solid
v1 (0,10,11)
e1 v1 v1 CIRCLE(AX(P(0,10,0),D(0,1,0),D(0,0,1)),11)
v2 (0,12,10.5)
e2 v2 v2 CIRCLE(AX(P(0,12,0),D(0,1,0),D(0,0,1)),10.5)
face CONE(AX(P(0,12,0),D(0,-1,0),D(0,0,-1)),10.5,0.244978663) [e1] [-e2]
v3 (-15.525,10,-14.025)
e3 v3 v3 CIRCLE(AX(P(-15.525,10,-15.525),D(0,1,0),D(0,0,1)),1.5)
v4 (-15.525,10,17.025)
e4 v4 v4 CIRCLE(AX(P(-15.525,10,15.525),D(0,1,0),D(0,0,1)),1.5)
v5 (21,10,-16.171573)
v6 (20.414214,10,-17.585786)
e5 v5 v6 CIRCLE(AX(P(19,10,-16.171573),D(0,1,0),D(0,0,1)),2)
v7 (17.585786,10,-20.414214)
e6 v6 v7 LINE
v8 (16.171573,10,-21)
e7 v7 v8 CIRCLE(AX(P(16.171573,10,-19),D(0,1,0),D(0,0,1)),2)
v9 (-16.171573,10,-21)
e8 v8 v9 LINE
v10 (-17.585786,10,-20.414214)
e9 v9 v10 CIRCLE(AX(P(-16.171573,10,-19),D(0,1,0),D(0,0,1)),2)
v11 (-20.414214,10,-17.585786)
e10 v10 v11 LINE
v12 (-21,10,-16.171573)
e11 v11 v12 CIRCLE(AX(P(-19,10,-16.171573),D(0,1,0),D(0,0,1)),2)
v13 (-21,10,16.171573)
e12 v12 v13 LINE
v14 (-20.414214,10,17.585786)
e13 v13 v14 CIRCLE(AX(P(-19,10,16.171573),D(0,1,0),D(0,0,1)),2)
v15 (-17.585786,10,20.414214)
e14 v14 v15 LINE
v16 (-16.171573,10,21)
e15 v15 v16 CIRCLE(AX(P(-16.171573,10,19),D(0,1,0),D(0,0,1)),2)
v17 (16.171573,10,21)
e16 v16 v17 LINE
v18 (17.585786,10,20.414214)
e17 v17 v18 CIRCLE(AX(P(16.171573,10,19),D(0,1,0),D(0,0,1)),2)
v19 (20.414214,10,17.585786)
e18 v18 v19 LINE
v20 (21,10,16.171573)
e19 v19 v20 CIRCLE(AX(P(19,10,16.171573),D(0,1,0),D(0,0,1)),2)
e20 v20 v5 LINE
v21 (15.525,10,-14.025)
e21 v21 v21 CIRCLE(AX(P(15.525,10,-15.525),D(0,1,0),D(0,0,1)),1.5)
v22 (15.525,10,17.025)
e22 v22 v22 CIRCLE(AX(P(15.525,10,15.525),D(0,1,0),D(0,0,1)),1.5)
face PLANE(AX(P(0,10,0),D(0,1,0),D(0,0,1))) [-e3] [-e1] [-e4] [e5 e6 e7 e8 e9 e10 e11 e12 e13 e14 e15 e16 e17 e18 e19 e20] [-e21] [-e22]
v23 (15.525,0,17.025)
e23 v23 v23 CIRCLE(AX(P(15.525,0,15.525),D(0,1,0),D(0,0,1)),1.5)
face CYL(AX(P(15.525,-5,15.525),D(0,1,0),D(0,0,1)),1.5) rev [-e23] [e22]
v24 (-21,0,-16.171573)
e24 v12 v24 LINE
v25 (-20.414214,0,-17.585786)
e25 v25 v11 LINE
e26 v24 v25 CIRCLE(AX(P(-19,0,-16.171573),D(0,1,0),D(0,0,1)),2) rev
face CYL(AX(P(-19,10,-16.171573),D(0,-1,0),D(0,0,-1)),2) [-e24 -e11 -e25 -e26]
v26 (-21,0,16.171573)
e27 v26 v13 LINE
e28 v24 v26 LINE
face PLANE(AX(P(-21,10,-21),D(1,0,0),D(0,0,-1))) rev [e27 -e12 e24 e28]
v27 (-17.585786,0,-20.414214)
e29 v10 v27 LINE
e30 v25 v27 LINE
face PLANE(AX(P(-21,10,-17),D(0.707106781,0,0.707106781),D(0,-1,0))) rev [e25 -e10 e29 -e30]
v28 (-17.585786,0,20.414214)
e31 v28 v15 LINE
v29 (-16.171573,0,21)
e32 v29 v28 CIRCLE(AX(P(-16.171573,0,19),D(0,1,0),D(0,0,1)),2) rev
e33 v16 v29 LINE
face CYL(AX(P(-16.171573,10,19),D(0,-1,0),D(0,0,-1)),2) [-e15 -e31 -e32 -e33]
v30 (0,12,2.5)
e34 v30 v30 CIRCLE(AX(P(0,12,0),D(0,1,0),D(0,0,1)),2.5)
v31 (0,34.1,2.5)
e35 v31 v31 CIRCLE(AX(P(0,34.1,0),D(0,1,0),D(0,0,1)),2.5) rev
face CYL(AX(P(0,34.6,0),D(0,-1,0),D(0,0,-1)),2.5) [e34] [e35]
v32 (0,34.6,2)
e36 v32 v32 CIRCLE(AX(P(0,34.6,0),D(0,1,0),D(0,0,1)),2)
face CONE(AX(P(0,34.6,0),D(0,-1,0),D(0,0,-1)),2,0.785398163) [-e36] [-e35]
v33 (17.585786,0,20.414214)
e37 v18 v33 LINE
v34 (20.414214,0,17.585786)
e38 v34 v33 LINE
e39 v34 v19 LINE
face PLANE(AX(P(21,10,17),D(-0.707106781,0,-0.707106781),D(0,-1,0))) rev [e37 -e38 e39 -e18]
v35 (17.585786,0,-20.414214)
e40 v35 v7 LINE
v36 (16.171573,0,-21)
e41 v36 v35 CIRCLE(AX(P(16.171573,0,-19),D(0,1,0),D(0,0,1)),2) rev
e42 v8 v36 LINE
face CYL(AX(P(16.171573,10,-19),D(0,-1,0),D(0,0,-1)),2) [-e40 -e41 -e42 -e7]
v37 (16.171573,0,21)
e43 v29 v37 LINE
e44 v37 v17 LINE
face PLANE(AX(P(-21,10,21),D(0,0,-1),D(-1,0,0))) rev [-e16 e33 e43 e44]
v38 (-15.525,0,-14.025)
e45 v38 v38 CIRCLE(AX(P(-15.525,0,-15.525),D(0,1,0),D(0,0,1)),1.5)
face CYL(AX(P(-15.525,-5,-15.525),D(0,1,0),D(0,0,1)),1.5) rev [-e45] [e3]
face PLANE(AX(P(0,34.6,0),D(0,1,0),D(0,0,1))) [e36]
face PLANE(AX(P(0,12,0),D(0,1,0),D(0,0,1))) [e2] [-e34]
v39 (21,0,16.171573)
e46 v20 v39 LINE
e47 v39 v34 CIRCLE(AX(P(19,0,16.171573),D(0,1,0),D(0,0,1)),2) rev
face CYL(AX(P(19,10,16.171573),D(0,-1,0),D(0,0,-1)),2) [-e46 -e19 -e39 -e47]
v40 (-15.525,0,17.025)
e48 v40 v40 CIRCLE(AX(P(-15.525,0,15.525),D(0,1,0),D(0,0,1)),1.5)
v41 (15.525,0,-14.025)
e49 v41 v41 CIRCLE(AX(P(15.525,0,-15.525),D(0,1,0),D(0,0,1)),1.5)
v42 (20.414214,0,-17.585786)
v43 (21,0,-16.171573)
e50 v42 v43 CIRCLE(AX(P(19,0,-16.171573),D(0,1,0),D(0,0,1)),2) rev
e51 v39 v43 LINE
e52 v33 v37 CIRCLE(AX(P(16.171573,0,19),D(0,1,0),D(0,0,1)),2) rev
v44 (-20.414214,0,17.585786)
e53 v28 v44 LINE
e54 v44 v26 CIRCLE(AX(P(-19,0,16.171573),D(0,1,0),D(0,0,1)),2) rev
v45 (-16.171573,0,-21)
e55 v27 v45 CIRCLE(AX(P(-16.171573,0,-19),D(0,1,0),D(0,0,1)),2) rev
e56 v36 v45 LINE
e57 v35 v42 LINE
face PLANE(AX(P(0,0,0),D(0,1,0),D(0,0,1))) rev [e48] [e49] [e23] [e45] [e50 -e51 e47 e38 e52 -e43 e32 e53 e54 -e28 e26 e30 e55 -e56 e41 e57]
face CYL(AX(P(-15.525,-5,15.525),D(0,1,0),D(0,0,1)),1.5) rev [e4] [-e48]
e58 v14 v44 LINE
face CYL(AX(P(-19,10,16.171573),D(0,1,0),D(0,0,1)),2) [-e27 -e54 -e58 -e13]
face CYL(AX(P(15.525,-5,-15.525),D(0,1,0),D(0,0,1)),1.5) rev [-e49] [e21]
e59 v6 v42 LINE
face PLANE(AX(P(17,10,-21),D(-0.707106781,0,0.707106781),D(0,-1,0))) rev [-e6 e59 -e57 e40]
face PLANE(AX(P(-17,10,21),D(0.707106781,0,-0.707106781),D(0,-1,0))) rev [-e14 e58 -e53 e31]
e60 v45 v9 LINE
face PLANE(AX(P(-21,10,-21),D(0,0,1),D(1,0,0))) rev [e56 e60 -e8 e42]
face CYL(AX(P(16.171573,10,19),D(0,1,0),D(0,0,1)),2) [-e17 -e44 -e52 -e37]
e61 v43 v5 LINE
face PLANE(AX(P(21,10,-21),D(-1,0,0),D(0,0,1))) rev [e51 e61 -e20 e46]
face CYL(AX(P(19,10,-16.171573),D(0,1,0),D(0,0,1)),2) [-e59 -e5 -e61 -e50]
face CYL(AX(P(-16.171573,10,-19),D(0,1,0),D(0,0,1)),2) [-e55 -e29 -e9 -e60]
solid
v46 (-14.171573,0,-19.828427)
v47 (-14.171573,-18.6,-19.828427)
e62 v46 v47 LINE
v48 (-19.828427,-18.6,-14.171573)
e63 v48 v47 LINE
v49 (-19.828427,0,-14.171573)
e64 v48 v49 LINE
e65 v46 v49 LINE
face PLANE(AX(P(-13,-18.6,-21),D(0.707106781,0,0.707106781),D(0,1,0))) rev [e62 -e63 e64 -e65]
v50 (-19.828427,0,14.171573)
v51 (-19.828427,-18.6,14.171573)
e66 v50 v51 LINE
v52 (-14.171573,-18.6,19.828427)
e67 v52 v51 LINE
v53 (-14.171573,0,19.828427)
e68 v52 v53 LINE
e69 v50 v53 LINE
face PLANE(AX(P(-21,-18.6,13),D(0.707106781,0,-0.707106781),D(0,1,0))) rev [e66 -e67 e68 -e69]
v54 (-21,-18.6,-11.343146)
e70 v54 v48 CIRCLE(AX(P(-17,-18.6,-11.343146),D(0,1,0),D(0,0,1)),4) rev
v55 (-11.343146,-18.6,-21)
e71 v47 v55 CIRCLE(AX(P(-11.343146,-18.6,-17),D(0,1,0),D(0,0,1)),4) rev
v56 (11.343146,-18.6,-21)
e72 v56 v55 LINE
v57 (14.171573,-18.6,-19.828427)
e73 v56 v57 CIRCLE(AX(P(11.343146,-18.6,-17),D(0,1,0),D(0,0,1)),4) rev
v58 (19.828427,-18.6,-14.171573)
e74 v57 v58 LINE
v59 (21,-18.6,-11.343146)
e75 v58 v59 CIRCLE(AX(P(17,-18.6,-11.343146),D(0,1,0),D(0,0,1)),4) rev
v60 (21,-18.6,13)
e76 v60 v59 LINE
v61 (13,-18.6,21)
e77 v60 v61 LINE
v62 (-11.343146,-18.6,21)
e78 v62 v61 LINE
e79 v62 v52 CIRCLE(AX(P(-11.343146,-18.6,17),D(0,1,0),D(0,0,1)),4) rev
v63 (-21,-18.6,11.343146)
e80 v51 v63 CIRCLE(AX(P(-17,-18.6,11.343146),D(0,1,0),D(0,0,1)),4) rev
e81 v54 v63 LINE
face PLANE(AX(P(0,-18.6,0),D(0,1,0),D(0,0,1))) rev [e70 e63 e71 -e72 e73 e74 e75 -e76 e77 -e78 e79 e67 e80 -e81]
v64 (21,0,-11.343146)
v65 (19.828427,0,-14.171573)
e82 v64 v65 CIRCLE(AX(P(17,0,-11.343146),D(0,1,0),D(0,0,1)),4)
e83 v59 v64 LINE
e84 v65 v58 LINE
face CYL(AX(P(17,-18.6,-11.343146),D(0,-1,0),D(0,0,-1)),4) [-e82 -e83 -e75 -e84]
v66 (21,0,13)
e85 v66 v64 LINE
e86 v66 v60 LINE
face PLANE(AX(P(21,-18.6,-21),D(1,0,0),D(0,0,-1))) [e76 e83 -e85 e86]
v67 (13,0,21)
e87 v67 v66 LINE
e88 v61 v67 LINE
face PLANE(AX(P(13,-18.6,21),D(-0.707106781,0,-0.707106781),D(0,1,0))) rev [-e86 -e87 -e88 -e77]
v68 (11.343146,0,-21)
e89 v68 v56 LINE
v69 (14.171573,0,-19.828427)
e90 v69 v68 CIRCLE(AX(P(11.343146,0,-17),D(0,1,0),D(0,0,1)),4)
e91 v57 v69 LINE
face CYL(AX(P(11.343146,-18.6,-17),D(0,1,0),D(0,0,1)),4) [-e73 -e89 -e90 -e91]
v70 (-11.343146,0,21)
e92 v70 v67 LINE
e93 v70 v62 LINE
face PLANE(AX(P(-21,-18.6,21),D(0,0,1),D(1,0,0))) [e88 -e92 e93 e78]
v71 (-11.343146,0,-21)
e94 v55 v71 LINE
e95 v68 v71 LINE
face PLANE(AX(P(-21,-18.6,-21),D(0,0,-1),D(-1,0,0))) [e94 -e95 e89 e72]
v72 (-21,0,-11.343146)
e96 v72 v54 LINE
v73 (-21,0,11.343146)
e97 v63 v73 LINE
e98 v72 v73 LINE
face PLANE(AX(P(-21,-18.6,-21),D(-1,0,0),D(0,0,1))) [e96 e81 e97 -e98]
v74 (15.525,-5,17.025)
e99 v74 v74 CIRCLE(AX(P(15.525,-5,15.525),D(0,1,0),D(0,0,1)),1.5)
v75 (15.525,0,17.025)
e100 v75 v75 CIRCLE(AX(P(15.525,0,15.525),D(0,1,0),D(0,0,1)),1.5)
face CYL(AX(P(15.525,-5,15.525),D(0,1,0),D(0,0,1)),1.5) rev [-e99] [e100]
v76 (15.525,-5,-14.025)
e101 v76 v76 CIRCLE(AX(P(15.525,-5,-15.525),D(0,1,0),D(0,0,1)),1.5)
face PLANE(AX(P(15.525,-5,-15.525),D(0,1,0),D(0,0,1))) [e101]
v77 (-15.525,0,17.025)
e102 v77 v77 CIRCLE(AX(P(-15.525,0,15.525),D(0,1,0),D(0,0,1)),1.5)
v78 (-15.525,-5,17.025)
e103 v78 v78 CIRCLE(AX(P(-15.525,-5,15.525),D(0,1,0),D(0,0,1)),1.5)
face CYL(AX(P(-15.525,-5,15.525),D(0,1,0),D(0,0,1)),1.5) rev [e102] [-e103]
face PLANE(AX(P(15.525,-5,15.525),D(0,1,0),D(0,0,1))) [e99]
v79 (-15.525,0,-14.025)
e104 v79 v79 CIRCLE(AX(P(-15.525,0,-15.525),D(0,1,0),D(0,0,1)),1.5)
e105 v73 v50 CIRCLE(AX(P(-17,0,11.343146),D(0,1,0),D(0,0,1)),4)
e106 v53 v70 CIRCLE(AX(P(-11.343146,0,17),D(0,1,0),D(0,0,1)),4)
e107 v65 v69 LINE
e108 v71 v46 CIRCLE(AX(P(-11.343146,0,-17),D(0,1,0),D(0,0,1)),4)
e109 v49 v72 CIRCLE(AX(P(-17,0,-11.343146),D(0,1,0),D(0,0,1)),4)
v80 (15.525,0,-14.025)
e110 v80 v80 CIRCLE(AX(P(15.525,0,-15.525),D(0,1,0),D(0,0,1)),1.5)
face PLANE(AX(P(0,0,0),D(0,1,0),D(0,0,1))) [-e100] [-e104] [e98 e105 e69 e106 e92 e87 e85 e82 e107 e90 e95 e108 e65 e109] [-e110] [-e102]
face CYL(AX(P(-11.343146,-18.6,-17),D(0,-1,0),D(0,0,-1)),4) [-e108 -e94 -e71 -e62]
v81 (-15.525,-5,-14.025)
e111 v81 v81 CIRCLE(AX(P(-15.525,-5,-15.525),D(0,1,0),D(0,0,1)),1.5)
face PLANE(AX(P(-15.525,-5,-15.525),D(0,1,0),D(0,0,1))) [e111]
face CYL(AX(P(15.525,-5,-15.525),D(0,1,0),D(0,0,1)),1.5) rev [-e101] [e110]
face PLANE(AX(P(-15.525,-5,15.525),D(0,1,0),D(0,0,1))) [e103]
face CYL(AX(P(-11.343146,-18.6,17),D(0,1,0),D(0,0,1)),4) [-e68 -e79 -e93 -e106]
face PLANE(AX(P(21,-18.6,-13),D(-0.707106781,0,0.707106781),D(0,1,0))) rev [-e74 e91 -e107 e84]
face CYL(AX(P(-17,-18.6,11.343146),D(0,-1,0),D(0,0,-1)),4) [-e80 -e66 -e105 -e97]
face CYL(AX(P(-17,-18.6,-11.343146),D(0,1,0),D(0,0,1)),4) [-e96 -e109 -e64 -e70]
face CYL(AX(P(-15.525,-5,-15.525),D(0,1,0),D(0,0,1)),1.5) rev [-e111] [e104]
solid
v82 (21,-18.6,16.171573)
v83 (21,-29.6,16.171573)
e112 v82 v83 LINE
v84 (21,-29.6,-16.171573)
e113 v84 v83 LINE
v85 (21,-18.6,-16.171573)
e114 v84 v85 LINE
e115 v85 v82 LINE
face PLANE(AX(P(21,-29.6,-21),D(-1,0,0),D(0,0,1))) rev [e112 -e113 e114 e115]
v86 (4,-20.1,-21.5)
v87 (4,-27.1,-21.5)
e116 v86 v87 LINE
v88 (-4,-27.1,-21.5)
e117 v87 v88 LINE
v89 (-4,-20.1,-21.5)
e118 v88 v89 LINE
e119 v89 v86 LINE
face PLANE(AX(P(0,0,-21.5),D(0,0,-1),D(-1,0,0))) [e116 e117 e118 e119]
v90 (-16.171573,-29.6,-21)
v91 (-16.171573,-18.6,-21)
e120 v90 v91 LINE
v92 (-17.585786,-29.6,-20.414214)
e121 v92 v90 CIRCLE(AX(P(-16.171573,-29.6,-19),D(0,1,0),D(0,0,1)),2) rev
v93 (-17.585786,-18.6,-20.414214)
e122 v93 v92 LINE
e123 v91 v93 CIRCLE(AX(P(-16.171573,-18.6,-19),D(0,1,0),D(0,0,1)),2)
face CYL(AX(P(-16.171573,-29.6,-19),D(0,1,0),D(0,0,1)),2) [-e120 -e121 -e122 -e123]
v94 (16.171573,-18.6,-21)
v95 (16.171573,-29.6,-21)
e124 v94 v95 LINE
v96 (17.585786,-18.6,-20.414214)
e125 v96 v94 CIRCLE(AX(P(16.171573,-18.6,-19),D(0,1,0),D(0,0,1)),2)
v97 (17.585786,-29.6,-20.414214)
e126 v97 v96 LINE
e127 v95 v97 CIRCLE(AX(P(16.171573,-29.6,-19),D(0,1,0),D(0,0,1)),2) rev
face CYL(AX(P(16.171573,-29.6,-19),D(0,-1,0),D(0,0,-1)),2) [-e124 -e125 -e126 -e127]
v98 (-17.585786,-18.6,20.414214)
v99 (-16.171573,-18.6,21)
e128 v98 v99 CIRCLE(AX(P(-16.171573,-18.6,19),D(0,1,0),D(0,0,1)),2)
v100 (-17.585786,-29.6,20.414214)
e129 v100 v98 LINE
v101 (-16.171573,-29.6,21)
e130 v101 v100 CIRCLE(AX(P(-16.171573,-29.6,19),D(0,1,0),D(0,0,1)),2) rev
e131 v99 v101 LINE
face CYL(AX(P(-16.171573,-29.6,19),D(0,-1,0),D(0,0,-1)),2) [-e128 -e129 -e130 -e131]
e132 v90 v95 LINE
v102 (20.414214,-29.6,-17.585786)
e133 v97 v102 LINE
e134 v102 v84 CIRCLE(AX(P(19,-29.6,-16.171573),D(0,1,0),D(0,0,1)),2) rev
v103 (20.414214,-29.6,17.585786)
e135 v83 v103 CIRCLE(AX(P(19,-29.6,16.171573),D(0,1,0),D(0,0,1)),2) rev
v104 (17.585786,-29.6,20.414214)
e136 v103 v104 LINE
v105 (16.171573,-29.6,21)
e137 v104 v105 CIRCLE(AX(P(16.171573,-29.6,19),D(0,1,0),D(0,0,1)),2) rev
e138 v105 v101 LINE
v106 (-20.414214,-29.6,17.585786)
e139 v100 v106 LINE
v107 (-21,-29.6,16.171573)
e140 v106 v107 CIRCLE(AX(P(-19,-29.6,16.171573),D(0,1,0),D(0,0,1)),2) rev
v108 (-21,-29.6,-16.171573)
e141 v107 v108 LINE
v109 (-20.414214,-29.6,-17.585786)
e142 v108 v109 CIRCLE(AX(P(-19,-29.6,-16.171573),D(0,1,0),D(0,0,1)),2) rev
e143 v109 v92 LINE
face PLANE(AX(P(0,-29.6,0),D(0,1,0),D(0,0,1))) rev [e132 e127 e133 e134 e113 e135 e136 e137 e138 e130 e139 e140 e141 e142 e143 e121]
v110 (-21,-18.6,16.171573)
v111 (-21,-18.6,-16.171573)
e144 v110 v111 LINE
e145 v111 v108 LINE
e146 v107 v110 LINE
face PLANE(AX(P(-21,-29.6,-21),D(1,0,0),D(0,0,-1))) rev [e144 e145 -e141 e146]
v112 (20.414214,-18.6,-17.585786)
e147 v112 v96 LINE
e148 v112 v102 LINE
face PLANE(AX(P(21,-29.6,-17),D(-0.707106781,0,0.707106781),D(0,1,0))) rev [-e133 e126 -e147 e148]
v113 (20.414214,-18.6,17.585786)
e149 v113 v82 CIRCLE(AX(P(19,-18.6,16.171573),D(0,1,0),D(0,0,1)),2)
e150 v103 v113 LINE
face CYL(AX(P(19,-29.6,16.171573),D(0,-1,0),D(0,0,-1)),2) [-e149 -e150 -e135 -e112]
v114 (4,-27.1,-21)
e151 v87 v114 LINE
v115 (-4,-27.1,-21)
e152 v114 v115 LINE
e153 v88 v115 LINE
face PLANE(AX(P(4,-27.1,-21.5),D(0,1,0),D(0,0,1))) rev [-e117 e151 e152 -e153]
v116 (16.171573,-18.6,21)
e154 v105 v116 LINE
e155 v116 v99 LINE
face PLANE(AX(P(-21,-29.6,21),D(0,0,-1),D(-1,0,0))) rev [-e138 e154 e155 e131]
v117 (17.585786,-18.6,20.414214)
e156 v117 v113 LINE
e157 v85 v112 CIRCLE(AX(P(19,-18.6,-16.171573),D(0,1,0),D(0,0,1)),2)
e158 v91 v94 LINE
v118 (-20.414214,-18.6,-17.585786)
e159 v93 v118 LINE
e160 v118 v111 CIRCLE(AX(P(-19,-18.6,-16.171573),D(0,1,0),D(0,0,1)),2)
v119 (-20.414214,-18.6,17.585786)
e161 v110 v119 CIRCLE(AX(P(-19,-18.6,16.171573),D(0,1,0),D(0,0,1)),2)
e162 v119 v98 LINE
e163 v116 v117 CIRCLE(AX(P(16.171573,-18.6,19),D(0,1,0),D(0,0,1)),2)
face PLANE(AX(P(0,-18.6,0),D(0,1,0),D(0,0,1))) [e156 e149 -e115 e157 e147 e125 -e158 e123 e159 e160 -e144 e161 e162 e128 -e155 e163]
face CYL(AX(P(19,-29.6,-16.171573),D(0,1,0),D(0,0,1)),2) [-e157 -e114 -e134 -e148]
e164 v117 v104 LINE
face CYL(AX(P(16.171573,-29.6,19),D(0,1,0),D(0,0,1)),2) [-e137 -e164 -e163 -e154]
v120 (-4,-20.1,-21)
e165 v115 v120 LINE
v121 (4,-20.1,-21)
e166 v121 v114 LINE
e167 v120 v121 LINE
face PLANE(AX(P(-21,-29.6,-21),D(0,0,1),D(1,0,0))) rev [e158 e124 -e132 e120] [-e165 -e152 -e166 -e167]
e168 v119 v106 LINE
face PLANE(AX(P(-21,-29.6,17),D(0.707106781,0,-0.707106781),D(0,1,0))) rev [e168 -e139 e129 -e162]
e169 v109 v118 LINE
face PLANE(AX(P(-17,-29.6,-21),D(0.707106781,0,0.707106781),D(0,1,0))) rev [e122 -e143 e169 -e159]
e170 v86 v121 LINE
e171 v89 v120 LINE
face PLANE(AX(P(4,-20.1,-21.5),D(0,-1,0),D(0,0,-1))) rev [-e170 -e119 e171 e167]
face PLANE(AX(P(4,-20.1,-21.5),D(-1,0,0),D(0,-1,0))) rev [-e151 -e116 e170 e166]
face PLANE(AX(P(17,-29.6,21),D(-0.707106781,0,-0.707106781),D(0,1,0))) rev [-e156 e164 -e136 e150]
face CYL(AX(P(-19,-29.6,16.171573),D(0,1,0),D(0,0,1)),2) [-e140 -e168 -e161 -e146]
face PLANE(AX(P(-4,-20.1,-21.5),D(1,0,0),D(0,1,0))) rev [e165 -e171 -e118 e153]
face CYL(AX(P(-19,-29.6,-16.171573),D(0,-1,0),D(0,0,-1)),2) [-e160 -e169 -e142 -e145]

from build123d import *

# Parameters (mm, degrees)
SKETCH1_W           = 42
SKETCH1_H           = 42
BOSS_EXTRUDE1_DEPTH = 10
SKETCH2_R           = 11
BOSS_EXTRUDE2_DEPTH = 2
SKETCH3_R           = 2.5
BOSS_EXTRUDE3_DEPTH = 22.6
CHAMFER2_SIZE       = 0.5
CHAMFER3_SIZE2      = 2
CHAMFER3_SIZE       = 0.5
SKETCH1_4_W         = 42
SKETCH1_4_H         = 42
BOSS_EXTRUDE6_DEPTH = 18.6
SKETCH6_W           = 42
SKETCH6_H           = 42
BOSS_EXTRUDE7_DEPTH = 11
CHAMFER5_SIZE       = 4
CHAMFER6_SIZE       = 4
FILLET2_R           = 2
FILLET3_R           = 2
SKETCH7_W           = 8
SKETCH7_H           = 7
BOSS_EXTRUDE8_DEPTH = 0.5
CHAMFER7_SIZE       = 8
FILLET4_R           = 4
SKETCH8_R           = 1.5
CUT_EXTRUDE2_DEPTH  = 15


with BuildPart() as part:
    # Sketch1 → Boss-Extrude1 (new body)
    with BuildSketch(Plane(origin=(0, 0, 0), x_dir=(1, 0, 0), z_dir=(0, 1, 0))):
        Rectangle(SKETCH1_W, SKETCH1_H)
    extrude(amount=BOSS_EXTRUDE1_DEPTH)

    # Sketch2 → Boss-Extrude2 (add)
    with BuildSketch(Plane(origin=(0, 10, 0), x_dir=(1, 0, 0), z_dir=(0, 1, 0))):
        with Locations(Location((0, 0, 0), (0, 0, 270))):
            Circle(SKETCH2_R)
    extrude(amount=BOSS_EXTRUDE2_DEPTH)

    # Sketch3 → Boss-Extrude3 (add)
    with BuildSketch(Plane(origin=(0, 12, 0), x_dir=(1, 0, 0), z_dir=(0, 1, 0))):
        with Locations(Location((0, 0, 0), (0, 0, 270))):
            Circle(SKETCH3_R)
    extrude(amount=BOSS_EXTRUDE3_DEPTH)

    # Chamfer2
    chamfer2_edges = [part.edges().sort_by_distance(p)[0] for p in [
        (0, 34.6, -2.5),
    ]]
    chamfer(chamfer2_edges, length=CHAMFER2_SIZE)

    # Chamfer3
    chamfer3_edges = [part.edges().sort_by_distance(p)[0] for p in [
        (0, 12, -11),
    ]]
    chamfer3_side = [part.faces().sort_by_distance(p)[0] for p in [
        (0, 12, -10.99),
    ]]
    chamfer(chamfer3_edges, length=CHAMFER3_SIZE - 0.0001, length2=CHAMFER3_SIZE2 - 0.0001, reference=chamfer3_side[0])  # a hair under: the kernel refuses the full size

    # Chamfer5
    chamfer5_edges = [part.edges().sort_by_distance(p)[0] for p in [
        (-21, 5, -21),
        (21, 5, -21),
        (21, 5, 21),
        (-21, 5, 21),
    ]]
    chamfer(chamfer5_edges, length=CHAMFER5_SIZE)

    # Fillet2
    fillet2_edges = [part.edges().sort_by_distance(p)[0] for p in [
        (21, 5, -17),
        (21, 5, 17),
        (-17, 5, 21),
        (17, 5, 21),
        (-17, 5, -21),
        (17, 5, -21),
        (-21, 5, -17),
        (-21, 5, 17),
    ]]
    fillet(fillet2_edges, radius=FILLET2_R)


with BuildPart() as body_2:
    # Sketch1<4> → Boss-Extrude6 (new body)
    with BuildSketch(Plane(origin=(0, 0, 0), x_dir=(1, 0, 0), z_dir=(0, 1, 0))):
        Rectangle(SKETCH1_4_W, SKETCH1_4_H)
    extrude(amount=-BOSS_EXTRUDE6_DEPTH)

    # Chamfer7
    chamfer7_edges = [body_2.edges().sort_by_distance(p)[0] for p in [
        (-21, -9.3, -21),
        (21, -9.3, -21),
        (21, -9.3, 21),
        (-21, -9.3, 21),
    ]]
    chamfer(chamfer7_edges, length=CHAMFER7_SIZE)

    # Fillet4
    fillet4_edges = [body_2.edges().sort_by_distance(p)[0] for p in [
        (13, -9.3, -21),
        (-13, -9.3, -21),
        (-21, -9.3, 13),
        (-21, -9.3, -13),
        (-13, -9.3, 21),
        (21, -9.3, -13),
    ]]
    fillet(fillet4_edges, radius=FILLET4_R)


with BuildPart() as body_3:
    # Sketch6 → Boss-Extrude7 (new body)
    with BuildSketch(Plane.XZ.offset(18.6)):
        Rectangle(SKETCH6_W, SKETCH6_H)
    extrude(amount=BOSS_EXTRUDE7_DEPTH)

    # Chamfer6
    chamfer6_edges = [body_3.edges().sort_by_distance(p)[0] for p in [
        (-21, -24.1, 21),
        (21, -24.1, 21),
        (21, -24.1, -21),
        (-21, -24.1, -21),
    ]]
    chamfer(chamfer6_edges, length=CHAMFER6_SIZE)

    # Fillet3
    fillet3_edges = [body_3.edges().sort_by_distance(p)[0] for p in [
        (21, -24.1, 17),
        (21, -24.1, -17),
        (-17, -24.1, -21),
        (17, -24.1, -21),
        (-21, -24.1, 17),
        (-21, -24.1, -17),
        (17, -24.1, 21),
        (-17, -24.1, 21),
    ]]
    fillet(fillet3_edges, radius=FILLET3_R)

    # Sketch7 → Boss-Extrude8 (add)
    with BuildSketch(Plane(origin=(0, 0, -21), x_dir=(-1, 0, 0), z_dir=(0, 0, -1))):
        with Locations((0, -23.6)):
            Rectangle(SKETCH7_W, SKETCH7_H)
    extrude(amount=BOSS_EXTRUDE8_DEPTH)


with BuildPart() as cut_extrude2_tool:
    # Sketch8 → Cut-Extrude2 (new body)
    with BuildSketch(Plane(origin=(0, 10, 0), x_dir=(1, 0, 0), z_dir=(0, 1, 0))):
        with Locations(Location((-15.525, 15.525, 0), (0, 0, 270))):
            Circle(SKETCH8_R)
        with Locations(Location((15.525, 15.525, 0), (0, 0, 270))):
            Circle(SKETCH8_R)
        with Locations(Location((15.525, -15.525, 0), (0, 0, 270))):
            Circle(SKETCH8_R)
        with Locations(Location((-15.525, -15.525, 0), (0, 0, 270))):
            Circle(SKETCH8_R)
    extrude(amount=-CUT_EXTRUDE2_DEPTH)


with BuildPart() as part_1:
    add(part.part)

    # Cut-Extrude2: cut by cut_extrude2_tool
    add(cut_extrude2_tool.part, mode=Mode.SUBTRACT)


with BuildPart() as body_2_1:
    add(body_2.part)

    # Cut-Extrude2: cut by cut_extrude2_tool
    add(cut_extrude2_tool.part, mode=Mode.SUBTRACT)


solid = Compound([body_3.part, part_1.part, body_2_1.part])
